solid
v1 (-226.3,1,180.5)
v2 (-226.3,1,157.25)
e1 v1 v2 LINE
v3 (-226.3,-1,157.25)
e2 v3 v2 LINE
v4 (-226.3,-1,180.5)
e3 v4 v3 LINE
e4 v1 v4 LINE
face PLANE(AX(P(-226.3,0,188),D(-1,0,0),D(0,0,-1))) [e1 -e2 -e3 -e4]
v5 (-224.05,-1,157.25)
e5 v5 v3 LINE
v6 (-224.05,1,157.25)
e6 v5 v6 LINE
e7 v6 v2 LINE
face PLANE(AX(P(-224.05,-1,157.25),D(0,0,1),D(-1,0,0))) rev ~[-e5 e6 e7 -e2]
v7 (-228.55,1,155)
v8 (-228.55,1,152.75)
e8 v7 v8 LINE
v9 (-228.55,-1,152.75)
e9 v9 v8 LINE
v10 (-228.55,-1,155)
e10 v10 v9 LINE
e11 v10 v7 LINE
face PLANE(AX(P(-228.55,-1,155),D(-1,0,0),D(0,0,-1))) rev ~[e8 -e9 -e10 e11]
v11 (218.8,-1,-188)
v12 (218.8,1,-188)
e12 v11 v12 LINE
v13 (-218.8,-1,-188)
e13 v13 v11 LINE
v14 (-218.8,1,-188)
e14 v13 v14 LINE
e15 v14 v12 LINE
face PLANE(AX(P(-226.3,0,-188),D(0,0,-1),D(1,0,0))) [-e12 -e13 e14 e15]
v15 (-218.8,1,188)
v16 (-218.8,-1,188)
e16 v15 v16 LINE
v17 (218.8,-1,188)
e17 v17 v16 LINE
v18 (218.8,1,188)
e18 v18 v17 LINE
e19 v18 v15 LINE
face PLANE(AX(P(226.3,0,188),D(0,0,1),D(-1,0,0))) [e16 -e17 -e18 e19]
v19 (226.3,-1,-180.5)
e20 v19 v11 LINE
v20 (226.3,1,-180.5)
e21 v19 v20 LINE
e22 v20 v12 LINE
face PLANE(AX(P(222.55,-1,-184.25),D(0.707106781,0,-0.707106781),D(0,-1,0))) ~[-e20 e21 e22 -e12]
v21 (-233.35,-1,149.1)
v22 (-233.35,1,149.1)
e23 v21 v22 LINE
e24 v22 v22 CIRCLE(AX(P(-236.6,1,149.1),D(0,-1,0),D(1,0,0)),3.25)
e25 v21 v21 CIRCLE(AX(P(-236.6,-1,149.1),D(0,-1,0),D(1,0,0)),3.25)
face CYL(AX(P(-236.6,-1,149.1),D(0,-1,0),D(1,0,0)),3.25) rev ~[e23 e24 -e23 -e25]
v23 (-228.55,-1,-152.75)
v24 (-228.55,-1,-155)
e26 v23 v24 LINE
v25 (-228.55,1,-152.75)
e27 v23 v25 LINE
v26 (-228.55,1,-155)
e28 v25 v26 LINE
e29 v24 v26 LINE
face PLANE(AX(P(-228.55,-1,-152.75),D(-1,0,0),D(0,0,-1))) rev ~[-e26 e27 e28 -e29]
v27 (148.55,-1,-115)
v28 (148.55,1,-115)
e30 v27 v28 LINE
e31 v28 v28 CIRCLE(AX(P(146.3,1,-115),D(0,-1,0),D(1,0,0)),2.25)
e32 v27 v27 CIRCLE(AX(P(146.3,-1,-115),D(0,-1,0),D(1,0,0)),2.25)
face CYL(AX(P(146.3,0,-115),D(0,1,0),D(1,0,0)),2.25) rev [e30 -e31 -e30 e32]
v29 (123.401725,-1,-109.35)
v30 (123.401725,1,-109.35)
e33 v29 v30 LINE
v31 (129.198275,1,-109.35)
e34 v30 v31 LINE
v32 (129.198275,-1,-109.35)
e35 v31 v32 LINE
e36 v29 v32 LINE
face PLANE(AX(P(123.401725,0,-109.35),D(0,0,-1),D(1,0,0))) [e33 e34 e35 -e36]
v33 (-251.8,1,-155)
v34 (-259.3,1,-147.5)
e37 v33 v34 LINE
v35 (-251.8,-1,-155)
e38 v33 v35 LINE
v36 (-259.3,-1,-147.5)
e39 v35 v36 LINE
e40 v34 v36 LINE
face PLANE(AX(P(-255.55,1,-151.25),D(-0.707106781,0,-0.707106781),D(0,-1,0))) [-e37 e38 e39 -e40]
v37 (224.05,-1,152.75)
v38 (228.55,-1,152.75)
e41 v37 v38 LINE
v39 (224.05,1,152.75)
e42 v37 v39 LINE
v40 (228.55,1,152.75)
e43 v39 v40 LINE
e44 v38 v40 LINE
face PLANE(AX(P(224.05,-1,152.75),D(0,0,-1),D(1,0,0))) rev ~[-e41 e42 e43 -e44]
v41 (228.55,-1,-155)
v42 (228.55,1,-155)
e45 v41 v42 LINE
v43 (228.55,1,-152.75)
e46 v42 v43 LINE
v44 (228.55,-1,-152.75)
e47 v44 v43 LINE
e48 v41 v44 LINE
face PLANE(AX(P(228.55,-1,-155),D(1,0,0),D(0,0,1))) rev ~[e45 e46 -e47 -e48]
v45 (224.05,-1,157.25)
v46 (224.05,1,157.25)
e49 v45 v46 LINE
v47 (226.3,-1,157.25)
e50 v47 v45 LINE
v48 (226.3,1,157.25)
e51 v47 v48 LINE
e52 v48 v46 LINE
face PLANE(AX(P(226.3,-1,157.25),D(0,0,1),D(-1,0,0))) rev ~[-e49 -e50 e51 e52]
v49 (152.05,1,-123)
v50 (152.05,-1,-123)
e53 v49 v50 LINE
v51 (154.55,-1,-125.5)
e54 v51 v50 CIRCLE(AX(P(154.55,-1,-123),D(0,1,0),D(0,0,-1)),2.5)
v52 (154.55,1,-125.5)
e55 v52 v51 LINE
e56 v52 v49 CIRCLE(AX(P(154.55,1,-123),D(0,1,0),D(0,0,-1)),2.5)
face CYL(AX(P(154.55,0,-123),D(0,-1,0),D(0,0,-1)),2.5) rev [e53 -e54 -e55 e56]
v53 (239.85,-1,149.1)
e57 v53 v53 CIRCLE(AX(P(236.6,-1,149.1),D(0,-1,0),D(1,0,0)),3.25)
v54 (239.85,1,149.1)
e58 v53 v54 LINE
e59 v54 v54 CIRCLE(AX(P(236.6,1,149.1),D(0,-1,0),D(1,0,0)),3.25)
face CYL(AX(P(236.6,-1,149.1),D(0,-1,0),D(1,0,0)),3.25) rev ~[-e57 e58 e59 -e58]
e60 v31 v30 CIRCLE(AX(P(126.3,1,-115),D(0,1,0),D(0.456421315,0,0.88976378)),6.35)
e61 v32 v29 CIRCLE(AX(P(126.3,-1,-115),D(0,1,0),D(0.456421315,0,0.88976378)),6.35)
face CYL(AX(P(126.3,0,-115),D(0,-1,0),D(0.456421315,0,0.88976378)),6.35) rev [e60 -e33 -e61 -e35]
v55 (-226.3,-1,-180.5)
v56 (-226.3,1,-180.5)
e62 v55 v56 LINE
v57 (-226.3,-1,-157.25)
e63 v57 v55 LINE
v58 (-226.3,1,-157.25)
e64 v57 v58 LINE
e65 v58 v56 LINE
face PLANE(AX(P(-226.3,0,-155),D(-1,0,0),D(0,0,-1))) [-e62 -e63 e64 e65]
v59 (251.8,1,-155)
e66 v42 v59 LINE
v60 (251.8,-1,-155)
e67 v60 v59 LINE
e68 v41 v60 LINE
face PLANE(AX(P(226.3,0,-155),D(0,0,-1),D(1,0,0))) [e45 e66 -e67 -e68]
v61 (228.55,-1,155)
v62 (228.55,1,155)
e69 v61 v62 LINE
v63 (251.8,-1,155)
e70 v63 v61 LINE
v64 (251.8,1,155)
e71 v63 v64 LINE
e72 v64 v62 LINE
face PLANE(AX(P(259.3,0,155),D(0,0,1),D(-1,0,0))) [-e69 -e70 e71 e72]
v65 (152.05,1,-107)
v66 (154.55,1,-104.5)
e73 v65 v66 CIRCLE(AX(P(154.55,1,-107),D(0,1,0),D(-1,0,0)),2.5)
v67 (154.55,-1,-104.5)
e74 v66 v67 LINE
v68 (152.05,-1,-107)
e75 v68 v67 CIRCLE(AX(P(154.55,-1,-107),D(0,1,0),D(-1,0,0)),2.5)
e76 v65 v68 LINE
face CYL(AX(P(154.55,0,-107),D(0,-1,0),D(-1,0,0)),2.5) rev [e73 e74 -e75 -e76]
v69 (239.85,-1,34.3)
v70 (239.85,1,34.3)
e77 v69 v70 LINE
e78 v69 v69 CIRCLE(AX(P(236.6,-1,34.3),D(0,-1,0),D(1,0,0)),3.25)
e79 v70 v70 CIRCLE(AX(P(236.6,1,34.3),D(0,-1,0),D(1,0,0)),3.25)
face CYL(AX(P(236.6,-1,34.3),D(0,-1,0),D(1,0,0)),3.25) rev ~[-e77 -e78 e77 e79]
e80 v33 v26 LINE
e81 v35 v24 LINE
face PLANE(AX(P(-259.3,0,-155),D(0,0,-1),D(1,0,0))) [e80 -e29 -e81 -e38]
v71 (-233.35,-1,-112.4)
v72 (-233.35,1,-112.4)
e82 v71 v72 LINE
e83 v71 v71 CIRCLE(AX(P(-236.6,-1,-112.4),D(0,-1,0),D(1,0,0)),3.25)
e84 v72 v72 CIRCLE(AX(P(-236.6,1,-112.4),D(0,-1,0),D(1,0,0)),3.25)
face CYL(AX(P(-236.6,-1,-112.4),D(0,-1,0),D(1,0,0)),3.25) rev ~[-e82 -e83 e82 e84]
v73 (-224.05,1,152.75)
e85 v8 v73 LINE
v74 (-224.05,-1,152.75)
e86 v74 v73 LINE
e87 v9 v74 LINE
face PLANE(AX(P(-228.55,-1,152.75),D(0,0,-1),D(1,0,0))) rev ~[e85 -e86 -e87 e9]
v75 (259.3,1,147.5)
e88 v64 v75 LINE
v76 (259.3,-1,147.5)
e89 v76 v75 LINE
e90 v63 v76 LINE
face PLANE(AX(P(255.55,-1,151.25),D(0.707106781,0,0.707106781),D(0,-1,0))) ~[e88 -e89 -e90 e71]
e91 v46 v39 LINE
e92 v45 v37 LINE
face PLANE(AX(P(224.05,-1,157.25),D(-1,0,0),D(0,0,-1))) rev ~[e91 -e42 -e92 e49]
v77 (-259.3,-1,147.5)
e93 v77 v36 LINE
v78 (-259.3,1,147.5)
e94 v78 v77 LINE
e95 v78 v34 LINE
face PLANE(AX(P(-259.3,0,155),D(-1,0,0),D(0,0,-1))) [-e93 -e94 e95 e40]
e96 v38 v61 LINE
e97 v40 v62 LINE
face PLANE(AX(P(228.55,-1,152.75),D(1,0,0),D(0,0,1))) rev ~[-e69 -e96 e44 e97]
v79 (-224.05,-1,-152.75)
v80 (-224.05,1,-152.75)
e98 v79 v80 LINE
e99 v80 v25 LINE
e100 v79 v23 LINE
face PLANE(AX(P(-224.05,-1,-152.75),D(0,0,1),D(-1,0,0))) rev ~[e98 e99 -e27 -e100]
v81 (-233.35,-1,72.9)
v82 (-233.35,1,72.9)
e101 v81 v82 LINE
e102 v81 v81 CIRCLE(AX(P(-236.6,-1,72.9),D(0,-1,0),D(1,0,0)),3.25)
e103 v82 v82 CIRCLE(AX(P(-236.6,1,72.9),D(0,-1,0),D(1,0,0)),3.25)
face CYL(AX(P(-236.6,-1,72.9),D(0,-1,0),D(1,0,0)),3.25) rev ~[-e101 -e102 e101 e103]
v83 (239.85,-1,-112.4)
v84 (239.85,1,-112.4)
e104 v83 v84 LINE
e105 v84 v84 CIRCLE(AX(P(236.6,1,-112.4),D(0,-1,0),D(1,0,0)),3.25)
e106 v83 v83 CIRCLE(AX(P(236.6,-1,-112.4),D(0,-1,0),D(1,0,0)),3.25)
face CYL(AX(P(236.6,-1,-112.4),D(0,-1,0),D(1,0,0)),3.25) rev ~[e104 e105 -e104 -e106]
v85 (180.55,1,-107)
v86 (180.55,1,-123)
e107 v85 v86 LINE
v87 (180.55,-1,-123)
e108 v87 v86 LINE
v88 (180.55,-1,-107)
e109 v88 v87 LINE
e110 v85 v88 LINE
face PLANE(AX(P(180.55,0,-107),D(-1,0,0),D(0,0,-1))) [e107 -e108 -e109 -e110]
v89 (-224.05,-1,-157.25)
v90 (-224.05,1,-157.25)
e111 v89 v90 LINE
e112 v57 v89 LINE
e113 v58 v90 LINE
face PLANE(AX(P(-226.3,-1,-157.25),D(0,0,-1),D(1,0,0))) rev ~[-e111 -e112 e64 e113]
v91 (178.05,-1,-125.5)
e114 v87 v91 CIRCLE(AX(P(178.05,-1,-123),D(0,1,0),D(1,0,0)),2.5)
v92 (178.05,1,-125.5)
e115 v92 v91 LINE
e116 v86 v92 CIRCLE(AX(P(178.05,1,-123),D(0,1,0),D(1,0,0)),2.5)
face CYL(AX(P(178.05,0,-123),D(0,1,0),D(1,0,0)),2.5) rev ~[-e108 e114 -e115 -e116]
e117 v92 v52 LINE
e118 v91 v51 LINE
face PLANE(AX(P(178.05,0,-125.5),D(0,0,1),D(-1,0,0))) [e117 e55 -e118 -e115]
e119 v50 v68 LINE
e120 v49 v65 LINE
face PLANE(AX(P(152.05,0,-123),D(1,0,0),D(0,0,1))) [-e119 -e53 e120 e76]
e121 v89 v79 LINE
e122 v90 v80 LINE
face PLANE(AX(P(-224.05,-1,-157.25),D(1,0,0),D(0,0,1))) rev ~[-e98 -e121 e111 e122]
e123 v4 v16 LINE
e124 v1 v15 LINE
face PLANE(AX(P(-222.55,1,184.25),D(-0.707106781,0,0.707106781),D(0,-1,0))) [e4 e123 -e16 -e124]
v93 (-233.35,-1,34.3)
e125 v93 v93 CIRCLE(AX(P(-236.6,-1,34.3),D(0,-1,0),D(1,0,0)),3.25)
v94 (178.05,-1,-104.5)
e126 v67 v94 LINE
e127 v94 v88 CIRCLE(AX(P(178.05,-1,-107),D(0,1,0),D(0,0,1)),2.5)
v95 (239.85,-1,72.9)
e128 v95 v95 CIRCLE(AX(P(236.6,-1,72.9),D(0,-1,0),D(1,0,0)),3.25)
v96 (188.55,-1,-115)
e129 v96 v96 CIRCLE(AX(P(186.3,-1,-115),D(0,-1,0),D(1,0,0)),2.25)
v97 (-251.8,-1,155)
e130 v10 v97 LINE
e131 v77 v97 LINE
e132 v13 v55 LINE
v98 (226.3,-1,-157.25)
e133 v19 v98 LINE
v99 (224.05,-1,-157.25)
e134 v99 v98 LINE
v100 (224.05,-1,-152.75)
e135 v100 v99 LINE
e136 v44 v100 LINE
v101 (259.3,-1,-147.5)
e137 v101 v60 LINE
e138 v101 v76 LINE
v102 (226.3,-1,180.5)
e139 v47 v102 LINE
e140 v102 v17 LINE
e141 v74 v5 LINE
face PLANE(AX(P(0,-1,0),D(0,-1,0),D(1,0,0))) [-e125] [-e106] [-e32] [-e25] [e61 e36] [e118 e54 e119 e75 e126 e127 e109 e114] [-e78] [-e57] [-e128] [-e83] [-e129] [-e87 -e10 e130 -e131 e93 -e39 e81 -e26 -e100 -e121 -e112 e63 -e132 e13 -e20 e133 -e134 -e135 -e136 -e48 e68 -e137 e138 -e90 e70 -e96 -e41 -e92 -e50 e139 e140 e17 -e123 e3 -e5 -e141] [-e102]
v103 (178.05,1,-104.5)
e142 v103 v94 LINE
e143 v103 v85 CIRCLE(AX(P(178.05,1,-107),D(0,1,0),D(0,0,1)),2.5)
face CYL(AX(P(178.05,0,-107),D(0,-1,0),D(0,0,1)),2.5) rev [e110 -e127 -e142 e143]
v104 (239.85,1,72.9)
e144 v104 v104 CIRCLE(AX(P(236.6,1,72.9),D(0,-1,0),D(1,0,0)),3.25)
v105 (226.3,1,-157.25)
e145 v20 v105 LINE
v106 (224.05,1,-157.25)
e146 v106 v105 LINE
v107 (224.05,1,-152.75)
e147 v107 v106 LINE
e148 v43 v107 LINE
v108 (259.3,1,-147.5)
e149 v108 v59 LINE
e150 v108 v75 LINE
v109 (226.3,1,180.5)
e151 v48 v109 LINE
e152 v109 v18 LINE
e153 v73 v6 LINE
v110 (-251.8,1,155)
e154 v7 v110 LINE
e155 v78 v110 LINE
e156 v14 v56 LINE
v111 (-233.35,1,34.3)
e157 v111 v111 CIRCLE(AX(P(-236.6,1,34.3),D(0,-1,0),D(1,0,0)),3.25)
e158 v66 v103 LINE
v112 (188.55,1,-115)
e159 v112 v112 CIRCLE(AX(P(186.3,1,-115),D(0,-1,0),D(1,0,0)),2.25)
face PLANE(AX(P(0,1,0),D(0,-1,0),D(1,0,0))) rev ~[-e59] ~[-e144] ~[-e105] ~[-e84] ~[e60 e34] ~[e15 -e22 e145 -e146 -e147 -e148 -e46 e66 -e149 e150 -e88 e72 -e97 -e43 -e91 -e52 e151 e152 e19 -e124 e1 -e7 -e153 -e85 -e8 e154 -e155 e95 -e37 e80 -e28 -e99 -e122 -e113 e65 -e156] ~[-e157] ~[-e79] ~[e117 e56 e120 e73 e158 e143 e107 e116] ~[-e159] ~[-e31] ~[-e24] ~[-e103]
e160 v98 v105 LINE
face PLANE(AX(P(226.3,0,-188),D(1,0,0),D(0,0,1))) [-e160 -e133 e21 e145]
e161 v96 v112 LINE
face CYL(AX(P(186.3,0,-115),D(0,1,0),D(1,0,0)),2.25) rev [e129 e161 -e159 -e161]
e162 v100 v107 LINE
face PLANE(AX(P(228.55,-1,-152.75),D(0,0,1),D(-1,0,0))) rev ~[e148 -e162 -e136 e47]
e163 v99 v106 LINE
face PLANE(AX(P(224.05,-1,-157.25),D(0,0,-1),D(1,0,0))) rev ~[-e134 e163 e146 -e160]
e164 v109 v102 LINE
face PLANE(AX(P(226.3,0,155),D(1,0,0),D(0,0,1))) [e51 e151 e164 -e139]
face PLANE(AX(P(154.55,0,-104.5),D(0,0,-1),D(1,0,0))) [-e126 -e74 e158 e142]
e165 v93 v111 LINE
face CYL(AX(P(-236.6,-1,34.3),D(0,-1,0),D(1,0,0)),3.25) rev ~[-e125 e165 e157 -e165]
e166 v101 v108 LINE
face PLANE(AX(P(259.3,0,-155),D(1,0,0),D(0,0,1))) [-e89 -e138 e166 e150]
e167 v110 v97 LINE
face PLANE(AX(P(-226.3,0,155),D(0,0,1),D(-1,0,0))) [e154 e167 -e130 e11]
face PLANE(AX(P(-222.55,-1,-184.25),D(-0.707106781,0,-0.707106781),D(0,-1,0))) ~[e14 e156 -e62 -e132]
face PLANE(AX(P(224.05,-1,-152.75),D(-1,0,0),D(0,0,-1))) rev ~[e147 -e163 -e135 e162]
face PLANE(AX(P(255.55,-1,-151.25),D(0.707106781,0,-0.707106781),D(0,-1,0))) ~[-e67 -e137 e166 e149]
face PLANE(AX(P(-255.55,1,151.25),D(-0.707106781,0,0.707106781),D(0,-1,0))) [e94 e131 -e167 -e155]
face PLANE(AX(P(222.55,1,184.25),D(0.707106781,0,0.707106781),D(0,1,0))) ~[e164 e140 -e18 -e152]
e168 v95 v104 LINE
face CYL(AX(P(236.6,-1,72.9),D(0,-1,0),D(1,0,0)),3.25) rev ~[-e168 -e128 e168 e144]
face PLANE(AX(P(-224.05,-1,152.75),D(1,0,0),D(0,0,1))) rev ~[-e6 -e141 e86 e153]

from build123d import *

# Parameters (mm, degrees)
F0_R     = 2.25
F1_DEPTH = 1
F2_SIZE  = 7.5
F3_R     = 3.25
F4_DEPTH = 2


# Not quite as in the source:
# - a feature names something its author has since deleted; it is built from what else it names


with BuildPart() as f1:
    # F0 (on Front) → F1 (new body, symmetric)
    with BuildSketch(Plane.XZ):
        Polygon((226.3, 155), (226.3, 188), (-226.3, 188), (-226.3, 155), (-259.3, 155), (-259.3, -155), (-226.3, -155), (-226.3, -188), (226.3, -188), (226.3, -155), (259.3, -155), (259.3, 155), align=None)
        with BuildLine():
            ThreePointArc((129.1982753492, -109.35), (126.3, -121.35), (123.4017246508, -109.35))
            Line((123.4017246508, -109.35), (129.1982753492, -109.35))
        make_face(mode=Mode.SUBTRACT)
        with Locations((146.3, -115)):
            Circle(F0_R, mode=Mode.SUBTRACT)
        with BuildLine():
            Line((154.55, -104.5), (178.05, -104.5))
            ThreePointArc((178.05, -104.5), (179.817766953, -105.232233047), (180.55, -107))
            Line((180.55, -107), (180.55, -123))
            ThreePointArc((180.55, -123), (179.817766953, -124.767766953), (178.05, -125.5))
            Line((178.05, -125.5), (154.55, -125.5))
            ThreePointArc((154.55, -125.5), (152.782233047, -124.767766953), (152.05, -123))
            Line((152.05, -123), (152.05, -107))
            ThreePointArc((152.05, -107), (152.782233047, -105.232233047), (154.55, -104.5))
        make_face(mode=Mode.SUBTRACT)
        with Locations((186.3, -115)):
            Circle(F0_R, mode=Mode.SUBTRACT)
    extrude(amount=F1_DEPTH, both=True)

    # F2
    f2_edges = [f1.edges().sort_by_distance(p)[0] for p in [
        (226.3, 0, 188),
        (259.3, 0, 155),
        (259.3, 0, -155),
        (226.3, 0, -188),
        (-226.3, 0, 188),
        (-259.3, 0, 155),
        (-259.3, 0, -155),
        (-226.3, 0, -188),
    ]]
    chamfer(f2_edges, length=F2_SIZE)

    # F3 (on face) → F4 (cut, through all)
    with BuildSketch(Plane.XZ.offset(1)):
        Polygon((-228.55, -152.75), (-228.55, -155), (-226.3, -155), (-226.3, -157.25), (-224.05, -157.25), (-224.05, -152.75), align=None)
        Polygon((226.3, -155), (228.55, -155), (228.55, -152.75), (224.05, -152.75), (224.05, -157.25), (226.3, -157.25), align=None)
        with Locations((-236.6, 149.1)):
            Circle(F3_R)
        with Locations((-236.6, 72.9)):
            Circle(F3_R)
        with Locations((-236.6, 34.3)):
            Circle(F3_R)
        with Locations((-236.6, -112.4)):
            Circle(F3_R)
        with Locations((236.6, -112.4)):
            Circle(F3_R)
        with Locations((236.6, 34.3)):
            Circle(F3_R)
        with Locations((236.6, 72.9)):
            Circle(F3_R)
        with Locations((236.6, 149.1)):
            Circle(F3_R)
        Polygon((226.3, 155), (226.3, 157.25), (224.05, 157.25), (224.05, 152.75), (228.55, 152.75), (228.55, 155), align=None)
        Polygon((-224.05, 152.75), (-224.05, 157.25), (-226.3, 157.25), (-226.3, 155), (-228.55, 155), (-228.55, 152.75), align=None)
    extrude(amount=-F4_DEPTH, mode=Mode.SUBTRACT)


solid = f1.part
